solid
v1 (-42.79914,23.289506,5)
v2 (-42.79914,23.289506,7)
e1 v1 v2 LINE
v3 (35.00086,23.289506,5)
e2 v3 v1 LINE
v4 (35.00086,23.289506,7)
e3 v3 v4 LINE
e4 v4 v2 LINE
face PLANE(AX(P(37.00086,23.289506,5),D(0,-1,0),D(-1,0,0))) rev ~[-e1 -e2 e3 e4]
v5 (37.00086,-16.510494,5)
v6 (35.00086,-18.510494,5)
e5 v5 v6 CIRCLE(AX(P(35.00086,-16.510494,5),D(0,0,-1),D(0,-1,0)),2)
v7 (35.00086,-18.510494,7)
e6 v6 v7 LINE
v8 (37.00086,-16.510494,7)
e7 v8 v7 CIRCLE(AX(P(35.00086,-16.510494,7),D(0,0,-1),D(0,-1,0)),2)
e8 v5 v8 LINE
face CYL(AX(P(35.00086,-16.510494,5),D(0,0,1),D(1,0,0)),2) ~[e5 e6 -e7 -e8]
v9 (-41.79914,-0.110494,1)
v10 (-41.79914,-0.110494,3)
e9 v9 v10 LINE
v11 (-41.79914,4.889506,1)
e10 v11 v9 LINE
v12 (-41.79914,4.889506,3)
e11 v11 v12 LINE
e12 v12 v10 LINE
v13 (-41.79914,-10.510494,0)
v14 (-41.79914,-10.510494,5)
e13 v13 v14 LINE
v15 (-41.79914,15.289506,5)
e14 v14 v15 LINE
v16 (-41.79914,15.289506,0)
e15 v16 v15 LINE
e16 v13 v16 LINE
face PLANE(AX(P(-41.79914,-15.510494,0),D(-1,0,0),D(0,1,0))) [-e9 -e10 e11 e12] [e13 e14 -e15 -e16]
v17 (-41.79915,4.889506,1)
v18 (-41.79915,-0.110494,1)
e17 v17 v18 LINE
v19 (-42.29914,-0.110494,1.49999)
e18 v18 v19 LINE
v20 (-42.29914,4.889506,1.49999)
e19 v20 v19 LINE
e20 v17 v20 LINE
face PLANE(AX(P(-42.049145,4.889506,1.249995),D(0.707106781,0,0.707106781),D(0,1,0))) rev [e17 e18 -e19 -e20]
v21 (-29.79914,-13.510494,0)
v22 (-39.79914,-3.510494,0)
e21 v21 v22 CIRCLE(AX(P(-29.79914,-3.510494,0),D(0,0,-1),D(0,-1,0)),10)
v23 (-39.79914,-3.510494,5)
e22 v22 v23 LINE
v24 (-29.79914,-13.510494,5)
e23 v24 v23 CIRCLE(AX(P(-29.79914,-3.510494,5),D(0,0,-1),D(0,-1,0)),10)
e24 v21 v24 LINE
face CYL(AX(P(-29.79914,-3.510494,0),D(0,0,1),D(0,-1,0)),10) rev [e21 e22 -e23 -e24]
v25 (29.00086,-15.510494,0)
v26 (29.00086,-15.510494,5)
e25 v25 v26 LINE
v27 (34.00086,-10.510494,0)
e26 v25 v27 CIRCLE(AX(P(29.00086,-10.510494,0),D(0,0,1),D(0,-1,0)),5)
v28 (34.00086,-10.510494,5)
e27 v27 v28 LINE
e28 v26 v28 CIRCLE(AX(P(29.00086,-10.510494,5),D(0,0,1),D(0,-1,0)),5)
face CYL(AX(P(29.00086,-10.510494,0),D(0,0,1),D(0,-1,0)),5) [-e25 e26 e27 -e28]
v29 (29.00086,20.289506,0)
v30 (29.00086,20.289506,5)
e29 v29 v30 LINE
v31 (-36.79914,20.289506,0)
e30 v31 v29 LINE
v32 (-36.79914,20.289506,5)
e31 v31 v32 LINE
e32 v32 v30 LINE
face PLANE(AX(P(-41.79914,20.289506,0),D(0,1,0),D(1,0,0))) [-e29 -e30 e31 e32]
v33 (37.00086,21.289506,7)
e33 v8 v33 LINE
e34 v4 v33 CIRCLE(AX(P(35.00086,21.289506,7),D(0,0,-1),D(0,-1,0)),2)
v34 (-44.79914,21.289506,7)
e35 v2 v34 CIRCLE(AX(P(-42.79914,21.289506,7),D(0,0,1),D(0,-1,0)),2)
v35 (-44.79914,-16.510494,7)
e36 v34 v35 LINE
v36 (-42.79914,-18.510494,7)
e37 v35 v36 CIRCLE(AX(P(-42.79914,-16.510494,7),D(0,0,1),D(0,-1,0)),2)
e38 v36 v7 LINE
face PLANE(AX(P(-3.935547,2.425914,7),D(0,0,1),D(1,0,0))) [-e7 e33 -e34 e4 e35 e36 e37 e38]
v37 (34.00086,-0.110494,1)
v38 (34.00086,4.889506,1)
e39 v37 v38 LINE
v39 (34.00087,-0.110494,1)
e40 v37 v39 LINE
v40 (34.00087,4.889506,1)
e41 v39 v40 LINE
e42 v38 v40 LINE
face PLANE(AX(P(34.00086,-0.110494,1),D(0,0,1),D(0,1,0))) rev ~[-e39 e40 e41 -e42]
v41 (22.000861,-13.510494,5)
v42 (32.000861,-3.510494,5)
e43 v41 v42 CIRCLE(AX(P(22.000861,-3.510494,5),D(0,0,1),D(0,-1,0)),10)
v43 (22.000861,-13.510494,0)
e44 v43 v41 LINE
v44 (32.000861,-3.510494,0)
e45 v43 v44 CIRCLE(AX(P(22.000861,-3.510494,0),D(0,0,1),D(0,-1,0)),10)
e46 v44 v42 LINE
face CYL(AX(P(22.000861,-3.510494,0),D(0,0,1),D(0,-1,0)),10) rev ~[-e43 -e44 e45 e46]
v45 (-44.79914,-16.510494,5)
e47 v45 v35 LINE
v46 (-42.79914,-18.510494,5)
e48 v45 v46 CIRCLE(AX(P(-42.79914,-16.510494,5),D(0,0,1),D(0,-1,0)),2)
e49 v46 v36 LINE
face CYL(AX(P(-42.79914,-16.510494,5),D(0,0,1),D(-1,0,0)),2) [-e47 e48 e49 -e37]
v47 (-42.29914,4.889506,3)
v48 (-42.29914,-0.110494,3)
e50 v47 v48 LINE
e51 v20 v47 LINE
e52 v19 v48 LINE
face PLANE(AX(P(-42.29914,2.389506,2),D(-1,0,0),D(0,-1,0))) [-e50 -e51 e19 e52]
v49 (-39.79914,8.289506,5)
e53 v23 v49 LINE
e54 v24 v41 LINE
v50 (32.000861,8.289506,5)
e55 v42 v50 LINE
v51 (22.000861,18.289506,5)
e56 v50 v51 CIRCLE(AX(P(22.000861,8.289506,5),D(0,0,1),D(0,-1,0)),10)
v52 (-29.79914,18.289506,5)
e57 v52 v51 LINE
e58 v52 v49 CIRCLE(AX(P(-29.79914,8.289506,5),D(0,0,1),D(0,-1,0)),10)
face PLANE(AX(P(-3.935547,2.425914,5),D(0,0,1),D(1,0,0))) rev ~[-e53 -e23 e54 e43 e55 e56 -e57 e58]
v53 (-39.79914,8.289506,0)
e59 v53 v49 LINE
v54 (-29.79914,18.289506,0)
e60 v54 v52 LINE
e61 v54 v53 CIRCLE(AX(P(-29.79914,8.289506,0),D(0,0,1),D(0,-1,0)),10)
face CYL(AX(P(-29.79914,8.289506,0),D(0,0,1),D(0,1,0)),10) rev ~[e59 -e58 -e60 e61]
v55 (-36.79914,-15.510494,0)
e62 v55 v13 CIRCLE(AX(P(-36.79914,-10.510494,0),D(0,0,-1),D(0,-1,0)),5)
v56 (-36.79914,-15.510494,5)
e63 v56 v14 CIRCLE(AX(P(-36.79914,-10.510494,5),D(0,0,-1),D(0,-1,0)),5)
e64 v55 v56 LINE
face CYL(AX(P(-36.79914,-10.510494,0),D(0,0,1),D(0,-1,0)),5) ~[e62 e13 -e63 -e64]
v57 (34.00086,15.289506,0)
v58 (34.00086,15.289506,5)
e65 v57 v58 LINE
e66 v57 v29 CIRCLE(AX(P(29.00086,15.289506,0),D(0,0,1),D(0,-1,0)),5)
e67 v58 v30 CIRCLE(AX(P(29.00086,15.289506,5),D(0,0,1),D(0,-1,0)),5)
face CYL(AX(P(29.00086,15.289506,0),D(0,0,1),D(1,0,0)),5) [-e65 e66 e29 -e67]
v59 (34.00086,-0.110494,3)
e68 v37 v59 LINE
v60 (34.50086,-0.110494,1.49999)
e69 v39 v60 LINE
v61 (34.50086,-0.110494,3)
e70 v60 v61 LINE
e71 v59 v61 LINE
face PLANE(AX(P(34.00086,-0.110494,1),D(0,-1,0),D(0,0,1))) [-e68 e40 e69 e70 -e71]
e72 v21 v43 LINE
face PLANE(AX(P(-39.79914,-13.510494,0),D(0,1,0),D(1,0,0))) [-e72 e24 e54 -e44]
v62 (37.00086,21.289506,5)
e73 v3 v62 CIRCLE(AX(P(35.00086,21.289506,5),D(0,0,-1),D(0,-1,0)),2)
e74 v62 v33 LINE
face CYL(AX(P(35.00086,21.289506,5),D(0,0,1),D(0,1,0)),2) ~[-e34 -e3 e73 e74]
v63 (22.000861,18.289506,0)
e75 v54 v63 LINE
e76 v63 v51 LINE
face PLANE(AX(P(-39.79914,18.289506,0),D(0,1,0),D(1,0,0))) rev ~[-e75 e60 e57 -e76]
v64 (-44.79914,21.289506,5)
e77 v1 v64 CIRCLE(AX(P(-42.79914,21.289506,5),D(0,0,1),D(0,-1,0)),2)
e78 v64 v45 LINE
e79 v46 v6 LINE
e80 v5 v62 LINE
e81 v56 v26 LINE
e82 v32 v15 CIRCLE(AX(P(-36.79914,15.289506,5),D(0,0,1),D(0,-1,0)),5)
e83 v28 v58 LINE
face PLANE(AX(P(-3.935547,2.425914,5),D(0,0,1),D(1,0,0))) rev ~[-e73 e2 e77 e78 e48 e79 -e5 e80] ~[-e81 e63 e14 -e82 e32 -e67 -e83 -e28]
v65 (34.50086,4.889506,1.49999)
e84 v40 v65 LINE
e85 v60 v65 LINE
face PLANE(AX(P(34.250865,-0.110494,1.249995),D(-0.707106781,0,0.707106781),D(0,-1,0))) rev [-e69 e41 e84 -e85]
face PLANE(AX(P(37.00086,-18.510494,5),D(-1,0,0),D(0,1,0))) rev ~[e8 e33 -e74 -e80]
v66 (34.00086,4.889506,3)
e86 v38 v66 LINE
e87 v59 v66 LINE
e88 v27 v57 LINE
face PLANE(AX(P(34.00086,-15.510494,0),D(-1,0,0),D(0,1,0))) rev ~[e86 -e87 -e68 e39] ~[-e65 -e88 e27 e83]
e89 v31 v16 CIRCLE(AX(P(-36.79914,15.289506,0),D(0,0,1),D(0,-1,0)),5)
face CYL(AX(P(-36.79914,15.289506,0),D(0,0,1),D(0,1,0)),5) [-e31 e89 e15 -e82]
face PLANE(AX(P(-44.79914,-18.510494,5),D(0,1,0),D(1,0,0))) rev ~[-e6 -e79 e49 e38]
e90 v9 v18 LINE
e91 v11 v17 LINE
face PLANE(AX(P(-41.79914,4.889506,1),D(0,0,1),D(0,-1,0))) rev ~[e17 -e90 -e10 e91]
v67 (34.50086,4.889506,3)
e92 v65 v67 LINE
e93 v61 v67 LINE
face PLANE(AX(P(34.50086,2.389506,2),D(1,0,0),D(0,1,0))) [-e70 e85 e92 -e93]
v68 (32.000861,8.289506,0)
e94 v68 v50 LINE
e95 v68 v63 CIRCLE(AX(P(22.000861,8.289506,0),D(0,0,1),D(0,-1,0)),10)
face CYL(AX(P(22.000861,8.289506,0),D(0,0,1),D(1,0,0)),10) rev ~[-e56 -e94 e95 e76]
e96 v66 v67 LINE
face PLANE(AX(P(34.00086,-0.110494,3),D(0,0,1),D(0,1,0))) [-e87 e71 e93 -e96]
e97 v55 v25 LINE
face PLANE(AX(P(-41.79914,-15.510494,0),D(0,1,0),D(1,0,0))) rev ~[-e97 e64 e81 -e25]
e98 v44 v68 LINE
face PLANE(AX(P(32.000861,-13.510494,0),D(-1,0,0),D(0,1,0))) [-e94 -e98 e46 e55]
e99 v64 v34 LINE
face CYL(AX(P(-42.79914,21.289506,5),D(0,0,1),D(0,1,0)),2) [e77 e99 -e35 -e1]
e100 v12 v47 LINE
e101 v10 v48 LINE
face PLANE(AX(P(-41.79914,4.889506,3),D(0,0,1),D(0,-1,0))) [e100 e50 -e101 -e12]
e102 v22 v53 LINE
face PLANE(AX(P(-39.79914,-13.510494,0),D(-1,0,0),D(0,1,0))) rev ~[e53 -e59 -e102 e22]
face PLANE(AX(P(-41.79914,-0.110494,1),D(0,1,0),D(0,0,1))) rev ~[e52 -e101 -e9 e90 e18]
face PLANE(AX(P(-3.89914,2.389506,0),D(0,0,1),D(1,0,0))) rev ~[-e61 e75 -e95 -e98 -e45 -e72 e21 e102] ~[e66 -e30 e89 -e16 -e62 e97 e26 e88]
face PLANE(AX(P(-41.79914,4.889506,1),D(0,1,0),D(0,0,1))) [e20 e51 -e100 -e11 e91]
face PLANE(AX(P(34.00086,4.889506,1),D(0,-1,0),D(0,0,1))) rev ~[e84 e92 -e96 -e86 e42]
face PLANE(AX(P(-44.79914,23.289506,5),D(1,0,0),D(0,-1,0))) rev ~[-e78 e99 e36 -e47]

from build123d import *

# Parameters (mm, degrees)
F0_W      = 75.8
F0_H      = 35.8
F0_W_2    = 71.8000013767
F0_H_2    = 31.8
F1_DEPTH  = 5
F2_W      = 3
F2_H      = 3
F3_DEPTH  = 2
F4_R      = 5
F5_R      = 10
F6_R      = 2
F7_W      = 5
F7_H      = 2
F8_DEPTH  = 0.5
F9_W      = 5
F9_H      = 2
F10_DEPTH = 0.5
F11_SIZE  = 0.49999


# Not quite as in the source:
# - a fillet or chamfer is up to 0.001 mm smaller than in the source, because OpenCascade refuses the exact size


with BuildPart() as f1:
    # F0 (on Top) → F1 (new body)
    with BuildSketch(Plane.XY):
        with Locations((-3.8991395473, 2.3895057946)):
            Rectangle(F0_W, F0_H)
        with Locations((-3.8991395473, 2.3895057946)):
            Rectangle(F0_W_2, F0_H_2, mode=Mode.SUBTRACT)
    extrude(amount=F1_DEPTH)

    # F2 (on face) → F3 (join)
    with BuildSketch(Plane.XY.offset(5)):
        Polygon((37.0008604527, 23.2895057946), (-44.7991395473, 23.2895057946), (-44.7991395473, -18.5104942054), (34.0008604527, -18.5104942054), (34.0008604527, -15.5104942054), (37.0008604527, -15.5104942054), align=None)
        with Locations((35.5008604527, -17.0104942054)):
            Rectangle(F2_W, F2_H)
    extrude(amount=F3_DEPTH)

    # F4
    f4_edges = [f1.edges().sort_by_distance(p)[0] for p in [
        (34.00086, 20.289506, 2.5),
        (34.00086, -15.510494, 2.5),
        (-41.79914, -15.510494, 2.5),
        (-41.79914, 20.289506, 2.5),
    ]]
    fillet(f4_edges, radius=F4_R)

    # F5
    f5_edges = [f1.edges().sort_by_distance(p)[0] for p in [
        (32.000861, -13.510494, 2.5),
        (32.000861, 18.289506, 2.5),
        (-39.79914, 18.289506, 2.5),
        (-39.79914, -13.510494, 2.5),
    ]]
    fillet(f5_edges, radius=F5_R)

    # F6
    f6_edges = [f1.edges().sort_by_distance(p)[0] for p in [
        (37.00086, -18.510494, 6),
        (37.00086, 23.289506, 6),
        (-44.79914, 23.289506, 6),
        (-44.79914, -18.510494, 6),
    ]]
    fillet(f6_edges, radius=F6_R)

    # F7 (on face) → F8 (join)
    with BuildSketch(Plane(origin=(-41.7991395473, 0, 0), x_dir=(0, -1, 0), z_dir=(-1, 0, 0))):
        with Locations((-2.3895057946, 2)):
            Rectangle(F7_W, F7_H)
    extrude(amount=F8_DEPTH)

    # F9 (on face) → F10 (join)
    with BuildSketch(Plane.YZ.offset(34.0008604527)):
        with Locations((2.3895057946, 2)):
            Rectangle(F9_W, F9_H)
    extrude(amount=F10_DEPTH)

    # F11 (size 0.5 in the source; OpenCascade refuses exactly that, so slightly less here)
    f11_edges = [f1.edges().sort_by_distance(p)[0] for p in [
        (34.50086, 2.389506, 1),
        (-42.29914, 2.389506, 1),
    ]]
    chamfer(f11_edges, length=F11_SIZE)


solid = f1.part
